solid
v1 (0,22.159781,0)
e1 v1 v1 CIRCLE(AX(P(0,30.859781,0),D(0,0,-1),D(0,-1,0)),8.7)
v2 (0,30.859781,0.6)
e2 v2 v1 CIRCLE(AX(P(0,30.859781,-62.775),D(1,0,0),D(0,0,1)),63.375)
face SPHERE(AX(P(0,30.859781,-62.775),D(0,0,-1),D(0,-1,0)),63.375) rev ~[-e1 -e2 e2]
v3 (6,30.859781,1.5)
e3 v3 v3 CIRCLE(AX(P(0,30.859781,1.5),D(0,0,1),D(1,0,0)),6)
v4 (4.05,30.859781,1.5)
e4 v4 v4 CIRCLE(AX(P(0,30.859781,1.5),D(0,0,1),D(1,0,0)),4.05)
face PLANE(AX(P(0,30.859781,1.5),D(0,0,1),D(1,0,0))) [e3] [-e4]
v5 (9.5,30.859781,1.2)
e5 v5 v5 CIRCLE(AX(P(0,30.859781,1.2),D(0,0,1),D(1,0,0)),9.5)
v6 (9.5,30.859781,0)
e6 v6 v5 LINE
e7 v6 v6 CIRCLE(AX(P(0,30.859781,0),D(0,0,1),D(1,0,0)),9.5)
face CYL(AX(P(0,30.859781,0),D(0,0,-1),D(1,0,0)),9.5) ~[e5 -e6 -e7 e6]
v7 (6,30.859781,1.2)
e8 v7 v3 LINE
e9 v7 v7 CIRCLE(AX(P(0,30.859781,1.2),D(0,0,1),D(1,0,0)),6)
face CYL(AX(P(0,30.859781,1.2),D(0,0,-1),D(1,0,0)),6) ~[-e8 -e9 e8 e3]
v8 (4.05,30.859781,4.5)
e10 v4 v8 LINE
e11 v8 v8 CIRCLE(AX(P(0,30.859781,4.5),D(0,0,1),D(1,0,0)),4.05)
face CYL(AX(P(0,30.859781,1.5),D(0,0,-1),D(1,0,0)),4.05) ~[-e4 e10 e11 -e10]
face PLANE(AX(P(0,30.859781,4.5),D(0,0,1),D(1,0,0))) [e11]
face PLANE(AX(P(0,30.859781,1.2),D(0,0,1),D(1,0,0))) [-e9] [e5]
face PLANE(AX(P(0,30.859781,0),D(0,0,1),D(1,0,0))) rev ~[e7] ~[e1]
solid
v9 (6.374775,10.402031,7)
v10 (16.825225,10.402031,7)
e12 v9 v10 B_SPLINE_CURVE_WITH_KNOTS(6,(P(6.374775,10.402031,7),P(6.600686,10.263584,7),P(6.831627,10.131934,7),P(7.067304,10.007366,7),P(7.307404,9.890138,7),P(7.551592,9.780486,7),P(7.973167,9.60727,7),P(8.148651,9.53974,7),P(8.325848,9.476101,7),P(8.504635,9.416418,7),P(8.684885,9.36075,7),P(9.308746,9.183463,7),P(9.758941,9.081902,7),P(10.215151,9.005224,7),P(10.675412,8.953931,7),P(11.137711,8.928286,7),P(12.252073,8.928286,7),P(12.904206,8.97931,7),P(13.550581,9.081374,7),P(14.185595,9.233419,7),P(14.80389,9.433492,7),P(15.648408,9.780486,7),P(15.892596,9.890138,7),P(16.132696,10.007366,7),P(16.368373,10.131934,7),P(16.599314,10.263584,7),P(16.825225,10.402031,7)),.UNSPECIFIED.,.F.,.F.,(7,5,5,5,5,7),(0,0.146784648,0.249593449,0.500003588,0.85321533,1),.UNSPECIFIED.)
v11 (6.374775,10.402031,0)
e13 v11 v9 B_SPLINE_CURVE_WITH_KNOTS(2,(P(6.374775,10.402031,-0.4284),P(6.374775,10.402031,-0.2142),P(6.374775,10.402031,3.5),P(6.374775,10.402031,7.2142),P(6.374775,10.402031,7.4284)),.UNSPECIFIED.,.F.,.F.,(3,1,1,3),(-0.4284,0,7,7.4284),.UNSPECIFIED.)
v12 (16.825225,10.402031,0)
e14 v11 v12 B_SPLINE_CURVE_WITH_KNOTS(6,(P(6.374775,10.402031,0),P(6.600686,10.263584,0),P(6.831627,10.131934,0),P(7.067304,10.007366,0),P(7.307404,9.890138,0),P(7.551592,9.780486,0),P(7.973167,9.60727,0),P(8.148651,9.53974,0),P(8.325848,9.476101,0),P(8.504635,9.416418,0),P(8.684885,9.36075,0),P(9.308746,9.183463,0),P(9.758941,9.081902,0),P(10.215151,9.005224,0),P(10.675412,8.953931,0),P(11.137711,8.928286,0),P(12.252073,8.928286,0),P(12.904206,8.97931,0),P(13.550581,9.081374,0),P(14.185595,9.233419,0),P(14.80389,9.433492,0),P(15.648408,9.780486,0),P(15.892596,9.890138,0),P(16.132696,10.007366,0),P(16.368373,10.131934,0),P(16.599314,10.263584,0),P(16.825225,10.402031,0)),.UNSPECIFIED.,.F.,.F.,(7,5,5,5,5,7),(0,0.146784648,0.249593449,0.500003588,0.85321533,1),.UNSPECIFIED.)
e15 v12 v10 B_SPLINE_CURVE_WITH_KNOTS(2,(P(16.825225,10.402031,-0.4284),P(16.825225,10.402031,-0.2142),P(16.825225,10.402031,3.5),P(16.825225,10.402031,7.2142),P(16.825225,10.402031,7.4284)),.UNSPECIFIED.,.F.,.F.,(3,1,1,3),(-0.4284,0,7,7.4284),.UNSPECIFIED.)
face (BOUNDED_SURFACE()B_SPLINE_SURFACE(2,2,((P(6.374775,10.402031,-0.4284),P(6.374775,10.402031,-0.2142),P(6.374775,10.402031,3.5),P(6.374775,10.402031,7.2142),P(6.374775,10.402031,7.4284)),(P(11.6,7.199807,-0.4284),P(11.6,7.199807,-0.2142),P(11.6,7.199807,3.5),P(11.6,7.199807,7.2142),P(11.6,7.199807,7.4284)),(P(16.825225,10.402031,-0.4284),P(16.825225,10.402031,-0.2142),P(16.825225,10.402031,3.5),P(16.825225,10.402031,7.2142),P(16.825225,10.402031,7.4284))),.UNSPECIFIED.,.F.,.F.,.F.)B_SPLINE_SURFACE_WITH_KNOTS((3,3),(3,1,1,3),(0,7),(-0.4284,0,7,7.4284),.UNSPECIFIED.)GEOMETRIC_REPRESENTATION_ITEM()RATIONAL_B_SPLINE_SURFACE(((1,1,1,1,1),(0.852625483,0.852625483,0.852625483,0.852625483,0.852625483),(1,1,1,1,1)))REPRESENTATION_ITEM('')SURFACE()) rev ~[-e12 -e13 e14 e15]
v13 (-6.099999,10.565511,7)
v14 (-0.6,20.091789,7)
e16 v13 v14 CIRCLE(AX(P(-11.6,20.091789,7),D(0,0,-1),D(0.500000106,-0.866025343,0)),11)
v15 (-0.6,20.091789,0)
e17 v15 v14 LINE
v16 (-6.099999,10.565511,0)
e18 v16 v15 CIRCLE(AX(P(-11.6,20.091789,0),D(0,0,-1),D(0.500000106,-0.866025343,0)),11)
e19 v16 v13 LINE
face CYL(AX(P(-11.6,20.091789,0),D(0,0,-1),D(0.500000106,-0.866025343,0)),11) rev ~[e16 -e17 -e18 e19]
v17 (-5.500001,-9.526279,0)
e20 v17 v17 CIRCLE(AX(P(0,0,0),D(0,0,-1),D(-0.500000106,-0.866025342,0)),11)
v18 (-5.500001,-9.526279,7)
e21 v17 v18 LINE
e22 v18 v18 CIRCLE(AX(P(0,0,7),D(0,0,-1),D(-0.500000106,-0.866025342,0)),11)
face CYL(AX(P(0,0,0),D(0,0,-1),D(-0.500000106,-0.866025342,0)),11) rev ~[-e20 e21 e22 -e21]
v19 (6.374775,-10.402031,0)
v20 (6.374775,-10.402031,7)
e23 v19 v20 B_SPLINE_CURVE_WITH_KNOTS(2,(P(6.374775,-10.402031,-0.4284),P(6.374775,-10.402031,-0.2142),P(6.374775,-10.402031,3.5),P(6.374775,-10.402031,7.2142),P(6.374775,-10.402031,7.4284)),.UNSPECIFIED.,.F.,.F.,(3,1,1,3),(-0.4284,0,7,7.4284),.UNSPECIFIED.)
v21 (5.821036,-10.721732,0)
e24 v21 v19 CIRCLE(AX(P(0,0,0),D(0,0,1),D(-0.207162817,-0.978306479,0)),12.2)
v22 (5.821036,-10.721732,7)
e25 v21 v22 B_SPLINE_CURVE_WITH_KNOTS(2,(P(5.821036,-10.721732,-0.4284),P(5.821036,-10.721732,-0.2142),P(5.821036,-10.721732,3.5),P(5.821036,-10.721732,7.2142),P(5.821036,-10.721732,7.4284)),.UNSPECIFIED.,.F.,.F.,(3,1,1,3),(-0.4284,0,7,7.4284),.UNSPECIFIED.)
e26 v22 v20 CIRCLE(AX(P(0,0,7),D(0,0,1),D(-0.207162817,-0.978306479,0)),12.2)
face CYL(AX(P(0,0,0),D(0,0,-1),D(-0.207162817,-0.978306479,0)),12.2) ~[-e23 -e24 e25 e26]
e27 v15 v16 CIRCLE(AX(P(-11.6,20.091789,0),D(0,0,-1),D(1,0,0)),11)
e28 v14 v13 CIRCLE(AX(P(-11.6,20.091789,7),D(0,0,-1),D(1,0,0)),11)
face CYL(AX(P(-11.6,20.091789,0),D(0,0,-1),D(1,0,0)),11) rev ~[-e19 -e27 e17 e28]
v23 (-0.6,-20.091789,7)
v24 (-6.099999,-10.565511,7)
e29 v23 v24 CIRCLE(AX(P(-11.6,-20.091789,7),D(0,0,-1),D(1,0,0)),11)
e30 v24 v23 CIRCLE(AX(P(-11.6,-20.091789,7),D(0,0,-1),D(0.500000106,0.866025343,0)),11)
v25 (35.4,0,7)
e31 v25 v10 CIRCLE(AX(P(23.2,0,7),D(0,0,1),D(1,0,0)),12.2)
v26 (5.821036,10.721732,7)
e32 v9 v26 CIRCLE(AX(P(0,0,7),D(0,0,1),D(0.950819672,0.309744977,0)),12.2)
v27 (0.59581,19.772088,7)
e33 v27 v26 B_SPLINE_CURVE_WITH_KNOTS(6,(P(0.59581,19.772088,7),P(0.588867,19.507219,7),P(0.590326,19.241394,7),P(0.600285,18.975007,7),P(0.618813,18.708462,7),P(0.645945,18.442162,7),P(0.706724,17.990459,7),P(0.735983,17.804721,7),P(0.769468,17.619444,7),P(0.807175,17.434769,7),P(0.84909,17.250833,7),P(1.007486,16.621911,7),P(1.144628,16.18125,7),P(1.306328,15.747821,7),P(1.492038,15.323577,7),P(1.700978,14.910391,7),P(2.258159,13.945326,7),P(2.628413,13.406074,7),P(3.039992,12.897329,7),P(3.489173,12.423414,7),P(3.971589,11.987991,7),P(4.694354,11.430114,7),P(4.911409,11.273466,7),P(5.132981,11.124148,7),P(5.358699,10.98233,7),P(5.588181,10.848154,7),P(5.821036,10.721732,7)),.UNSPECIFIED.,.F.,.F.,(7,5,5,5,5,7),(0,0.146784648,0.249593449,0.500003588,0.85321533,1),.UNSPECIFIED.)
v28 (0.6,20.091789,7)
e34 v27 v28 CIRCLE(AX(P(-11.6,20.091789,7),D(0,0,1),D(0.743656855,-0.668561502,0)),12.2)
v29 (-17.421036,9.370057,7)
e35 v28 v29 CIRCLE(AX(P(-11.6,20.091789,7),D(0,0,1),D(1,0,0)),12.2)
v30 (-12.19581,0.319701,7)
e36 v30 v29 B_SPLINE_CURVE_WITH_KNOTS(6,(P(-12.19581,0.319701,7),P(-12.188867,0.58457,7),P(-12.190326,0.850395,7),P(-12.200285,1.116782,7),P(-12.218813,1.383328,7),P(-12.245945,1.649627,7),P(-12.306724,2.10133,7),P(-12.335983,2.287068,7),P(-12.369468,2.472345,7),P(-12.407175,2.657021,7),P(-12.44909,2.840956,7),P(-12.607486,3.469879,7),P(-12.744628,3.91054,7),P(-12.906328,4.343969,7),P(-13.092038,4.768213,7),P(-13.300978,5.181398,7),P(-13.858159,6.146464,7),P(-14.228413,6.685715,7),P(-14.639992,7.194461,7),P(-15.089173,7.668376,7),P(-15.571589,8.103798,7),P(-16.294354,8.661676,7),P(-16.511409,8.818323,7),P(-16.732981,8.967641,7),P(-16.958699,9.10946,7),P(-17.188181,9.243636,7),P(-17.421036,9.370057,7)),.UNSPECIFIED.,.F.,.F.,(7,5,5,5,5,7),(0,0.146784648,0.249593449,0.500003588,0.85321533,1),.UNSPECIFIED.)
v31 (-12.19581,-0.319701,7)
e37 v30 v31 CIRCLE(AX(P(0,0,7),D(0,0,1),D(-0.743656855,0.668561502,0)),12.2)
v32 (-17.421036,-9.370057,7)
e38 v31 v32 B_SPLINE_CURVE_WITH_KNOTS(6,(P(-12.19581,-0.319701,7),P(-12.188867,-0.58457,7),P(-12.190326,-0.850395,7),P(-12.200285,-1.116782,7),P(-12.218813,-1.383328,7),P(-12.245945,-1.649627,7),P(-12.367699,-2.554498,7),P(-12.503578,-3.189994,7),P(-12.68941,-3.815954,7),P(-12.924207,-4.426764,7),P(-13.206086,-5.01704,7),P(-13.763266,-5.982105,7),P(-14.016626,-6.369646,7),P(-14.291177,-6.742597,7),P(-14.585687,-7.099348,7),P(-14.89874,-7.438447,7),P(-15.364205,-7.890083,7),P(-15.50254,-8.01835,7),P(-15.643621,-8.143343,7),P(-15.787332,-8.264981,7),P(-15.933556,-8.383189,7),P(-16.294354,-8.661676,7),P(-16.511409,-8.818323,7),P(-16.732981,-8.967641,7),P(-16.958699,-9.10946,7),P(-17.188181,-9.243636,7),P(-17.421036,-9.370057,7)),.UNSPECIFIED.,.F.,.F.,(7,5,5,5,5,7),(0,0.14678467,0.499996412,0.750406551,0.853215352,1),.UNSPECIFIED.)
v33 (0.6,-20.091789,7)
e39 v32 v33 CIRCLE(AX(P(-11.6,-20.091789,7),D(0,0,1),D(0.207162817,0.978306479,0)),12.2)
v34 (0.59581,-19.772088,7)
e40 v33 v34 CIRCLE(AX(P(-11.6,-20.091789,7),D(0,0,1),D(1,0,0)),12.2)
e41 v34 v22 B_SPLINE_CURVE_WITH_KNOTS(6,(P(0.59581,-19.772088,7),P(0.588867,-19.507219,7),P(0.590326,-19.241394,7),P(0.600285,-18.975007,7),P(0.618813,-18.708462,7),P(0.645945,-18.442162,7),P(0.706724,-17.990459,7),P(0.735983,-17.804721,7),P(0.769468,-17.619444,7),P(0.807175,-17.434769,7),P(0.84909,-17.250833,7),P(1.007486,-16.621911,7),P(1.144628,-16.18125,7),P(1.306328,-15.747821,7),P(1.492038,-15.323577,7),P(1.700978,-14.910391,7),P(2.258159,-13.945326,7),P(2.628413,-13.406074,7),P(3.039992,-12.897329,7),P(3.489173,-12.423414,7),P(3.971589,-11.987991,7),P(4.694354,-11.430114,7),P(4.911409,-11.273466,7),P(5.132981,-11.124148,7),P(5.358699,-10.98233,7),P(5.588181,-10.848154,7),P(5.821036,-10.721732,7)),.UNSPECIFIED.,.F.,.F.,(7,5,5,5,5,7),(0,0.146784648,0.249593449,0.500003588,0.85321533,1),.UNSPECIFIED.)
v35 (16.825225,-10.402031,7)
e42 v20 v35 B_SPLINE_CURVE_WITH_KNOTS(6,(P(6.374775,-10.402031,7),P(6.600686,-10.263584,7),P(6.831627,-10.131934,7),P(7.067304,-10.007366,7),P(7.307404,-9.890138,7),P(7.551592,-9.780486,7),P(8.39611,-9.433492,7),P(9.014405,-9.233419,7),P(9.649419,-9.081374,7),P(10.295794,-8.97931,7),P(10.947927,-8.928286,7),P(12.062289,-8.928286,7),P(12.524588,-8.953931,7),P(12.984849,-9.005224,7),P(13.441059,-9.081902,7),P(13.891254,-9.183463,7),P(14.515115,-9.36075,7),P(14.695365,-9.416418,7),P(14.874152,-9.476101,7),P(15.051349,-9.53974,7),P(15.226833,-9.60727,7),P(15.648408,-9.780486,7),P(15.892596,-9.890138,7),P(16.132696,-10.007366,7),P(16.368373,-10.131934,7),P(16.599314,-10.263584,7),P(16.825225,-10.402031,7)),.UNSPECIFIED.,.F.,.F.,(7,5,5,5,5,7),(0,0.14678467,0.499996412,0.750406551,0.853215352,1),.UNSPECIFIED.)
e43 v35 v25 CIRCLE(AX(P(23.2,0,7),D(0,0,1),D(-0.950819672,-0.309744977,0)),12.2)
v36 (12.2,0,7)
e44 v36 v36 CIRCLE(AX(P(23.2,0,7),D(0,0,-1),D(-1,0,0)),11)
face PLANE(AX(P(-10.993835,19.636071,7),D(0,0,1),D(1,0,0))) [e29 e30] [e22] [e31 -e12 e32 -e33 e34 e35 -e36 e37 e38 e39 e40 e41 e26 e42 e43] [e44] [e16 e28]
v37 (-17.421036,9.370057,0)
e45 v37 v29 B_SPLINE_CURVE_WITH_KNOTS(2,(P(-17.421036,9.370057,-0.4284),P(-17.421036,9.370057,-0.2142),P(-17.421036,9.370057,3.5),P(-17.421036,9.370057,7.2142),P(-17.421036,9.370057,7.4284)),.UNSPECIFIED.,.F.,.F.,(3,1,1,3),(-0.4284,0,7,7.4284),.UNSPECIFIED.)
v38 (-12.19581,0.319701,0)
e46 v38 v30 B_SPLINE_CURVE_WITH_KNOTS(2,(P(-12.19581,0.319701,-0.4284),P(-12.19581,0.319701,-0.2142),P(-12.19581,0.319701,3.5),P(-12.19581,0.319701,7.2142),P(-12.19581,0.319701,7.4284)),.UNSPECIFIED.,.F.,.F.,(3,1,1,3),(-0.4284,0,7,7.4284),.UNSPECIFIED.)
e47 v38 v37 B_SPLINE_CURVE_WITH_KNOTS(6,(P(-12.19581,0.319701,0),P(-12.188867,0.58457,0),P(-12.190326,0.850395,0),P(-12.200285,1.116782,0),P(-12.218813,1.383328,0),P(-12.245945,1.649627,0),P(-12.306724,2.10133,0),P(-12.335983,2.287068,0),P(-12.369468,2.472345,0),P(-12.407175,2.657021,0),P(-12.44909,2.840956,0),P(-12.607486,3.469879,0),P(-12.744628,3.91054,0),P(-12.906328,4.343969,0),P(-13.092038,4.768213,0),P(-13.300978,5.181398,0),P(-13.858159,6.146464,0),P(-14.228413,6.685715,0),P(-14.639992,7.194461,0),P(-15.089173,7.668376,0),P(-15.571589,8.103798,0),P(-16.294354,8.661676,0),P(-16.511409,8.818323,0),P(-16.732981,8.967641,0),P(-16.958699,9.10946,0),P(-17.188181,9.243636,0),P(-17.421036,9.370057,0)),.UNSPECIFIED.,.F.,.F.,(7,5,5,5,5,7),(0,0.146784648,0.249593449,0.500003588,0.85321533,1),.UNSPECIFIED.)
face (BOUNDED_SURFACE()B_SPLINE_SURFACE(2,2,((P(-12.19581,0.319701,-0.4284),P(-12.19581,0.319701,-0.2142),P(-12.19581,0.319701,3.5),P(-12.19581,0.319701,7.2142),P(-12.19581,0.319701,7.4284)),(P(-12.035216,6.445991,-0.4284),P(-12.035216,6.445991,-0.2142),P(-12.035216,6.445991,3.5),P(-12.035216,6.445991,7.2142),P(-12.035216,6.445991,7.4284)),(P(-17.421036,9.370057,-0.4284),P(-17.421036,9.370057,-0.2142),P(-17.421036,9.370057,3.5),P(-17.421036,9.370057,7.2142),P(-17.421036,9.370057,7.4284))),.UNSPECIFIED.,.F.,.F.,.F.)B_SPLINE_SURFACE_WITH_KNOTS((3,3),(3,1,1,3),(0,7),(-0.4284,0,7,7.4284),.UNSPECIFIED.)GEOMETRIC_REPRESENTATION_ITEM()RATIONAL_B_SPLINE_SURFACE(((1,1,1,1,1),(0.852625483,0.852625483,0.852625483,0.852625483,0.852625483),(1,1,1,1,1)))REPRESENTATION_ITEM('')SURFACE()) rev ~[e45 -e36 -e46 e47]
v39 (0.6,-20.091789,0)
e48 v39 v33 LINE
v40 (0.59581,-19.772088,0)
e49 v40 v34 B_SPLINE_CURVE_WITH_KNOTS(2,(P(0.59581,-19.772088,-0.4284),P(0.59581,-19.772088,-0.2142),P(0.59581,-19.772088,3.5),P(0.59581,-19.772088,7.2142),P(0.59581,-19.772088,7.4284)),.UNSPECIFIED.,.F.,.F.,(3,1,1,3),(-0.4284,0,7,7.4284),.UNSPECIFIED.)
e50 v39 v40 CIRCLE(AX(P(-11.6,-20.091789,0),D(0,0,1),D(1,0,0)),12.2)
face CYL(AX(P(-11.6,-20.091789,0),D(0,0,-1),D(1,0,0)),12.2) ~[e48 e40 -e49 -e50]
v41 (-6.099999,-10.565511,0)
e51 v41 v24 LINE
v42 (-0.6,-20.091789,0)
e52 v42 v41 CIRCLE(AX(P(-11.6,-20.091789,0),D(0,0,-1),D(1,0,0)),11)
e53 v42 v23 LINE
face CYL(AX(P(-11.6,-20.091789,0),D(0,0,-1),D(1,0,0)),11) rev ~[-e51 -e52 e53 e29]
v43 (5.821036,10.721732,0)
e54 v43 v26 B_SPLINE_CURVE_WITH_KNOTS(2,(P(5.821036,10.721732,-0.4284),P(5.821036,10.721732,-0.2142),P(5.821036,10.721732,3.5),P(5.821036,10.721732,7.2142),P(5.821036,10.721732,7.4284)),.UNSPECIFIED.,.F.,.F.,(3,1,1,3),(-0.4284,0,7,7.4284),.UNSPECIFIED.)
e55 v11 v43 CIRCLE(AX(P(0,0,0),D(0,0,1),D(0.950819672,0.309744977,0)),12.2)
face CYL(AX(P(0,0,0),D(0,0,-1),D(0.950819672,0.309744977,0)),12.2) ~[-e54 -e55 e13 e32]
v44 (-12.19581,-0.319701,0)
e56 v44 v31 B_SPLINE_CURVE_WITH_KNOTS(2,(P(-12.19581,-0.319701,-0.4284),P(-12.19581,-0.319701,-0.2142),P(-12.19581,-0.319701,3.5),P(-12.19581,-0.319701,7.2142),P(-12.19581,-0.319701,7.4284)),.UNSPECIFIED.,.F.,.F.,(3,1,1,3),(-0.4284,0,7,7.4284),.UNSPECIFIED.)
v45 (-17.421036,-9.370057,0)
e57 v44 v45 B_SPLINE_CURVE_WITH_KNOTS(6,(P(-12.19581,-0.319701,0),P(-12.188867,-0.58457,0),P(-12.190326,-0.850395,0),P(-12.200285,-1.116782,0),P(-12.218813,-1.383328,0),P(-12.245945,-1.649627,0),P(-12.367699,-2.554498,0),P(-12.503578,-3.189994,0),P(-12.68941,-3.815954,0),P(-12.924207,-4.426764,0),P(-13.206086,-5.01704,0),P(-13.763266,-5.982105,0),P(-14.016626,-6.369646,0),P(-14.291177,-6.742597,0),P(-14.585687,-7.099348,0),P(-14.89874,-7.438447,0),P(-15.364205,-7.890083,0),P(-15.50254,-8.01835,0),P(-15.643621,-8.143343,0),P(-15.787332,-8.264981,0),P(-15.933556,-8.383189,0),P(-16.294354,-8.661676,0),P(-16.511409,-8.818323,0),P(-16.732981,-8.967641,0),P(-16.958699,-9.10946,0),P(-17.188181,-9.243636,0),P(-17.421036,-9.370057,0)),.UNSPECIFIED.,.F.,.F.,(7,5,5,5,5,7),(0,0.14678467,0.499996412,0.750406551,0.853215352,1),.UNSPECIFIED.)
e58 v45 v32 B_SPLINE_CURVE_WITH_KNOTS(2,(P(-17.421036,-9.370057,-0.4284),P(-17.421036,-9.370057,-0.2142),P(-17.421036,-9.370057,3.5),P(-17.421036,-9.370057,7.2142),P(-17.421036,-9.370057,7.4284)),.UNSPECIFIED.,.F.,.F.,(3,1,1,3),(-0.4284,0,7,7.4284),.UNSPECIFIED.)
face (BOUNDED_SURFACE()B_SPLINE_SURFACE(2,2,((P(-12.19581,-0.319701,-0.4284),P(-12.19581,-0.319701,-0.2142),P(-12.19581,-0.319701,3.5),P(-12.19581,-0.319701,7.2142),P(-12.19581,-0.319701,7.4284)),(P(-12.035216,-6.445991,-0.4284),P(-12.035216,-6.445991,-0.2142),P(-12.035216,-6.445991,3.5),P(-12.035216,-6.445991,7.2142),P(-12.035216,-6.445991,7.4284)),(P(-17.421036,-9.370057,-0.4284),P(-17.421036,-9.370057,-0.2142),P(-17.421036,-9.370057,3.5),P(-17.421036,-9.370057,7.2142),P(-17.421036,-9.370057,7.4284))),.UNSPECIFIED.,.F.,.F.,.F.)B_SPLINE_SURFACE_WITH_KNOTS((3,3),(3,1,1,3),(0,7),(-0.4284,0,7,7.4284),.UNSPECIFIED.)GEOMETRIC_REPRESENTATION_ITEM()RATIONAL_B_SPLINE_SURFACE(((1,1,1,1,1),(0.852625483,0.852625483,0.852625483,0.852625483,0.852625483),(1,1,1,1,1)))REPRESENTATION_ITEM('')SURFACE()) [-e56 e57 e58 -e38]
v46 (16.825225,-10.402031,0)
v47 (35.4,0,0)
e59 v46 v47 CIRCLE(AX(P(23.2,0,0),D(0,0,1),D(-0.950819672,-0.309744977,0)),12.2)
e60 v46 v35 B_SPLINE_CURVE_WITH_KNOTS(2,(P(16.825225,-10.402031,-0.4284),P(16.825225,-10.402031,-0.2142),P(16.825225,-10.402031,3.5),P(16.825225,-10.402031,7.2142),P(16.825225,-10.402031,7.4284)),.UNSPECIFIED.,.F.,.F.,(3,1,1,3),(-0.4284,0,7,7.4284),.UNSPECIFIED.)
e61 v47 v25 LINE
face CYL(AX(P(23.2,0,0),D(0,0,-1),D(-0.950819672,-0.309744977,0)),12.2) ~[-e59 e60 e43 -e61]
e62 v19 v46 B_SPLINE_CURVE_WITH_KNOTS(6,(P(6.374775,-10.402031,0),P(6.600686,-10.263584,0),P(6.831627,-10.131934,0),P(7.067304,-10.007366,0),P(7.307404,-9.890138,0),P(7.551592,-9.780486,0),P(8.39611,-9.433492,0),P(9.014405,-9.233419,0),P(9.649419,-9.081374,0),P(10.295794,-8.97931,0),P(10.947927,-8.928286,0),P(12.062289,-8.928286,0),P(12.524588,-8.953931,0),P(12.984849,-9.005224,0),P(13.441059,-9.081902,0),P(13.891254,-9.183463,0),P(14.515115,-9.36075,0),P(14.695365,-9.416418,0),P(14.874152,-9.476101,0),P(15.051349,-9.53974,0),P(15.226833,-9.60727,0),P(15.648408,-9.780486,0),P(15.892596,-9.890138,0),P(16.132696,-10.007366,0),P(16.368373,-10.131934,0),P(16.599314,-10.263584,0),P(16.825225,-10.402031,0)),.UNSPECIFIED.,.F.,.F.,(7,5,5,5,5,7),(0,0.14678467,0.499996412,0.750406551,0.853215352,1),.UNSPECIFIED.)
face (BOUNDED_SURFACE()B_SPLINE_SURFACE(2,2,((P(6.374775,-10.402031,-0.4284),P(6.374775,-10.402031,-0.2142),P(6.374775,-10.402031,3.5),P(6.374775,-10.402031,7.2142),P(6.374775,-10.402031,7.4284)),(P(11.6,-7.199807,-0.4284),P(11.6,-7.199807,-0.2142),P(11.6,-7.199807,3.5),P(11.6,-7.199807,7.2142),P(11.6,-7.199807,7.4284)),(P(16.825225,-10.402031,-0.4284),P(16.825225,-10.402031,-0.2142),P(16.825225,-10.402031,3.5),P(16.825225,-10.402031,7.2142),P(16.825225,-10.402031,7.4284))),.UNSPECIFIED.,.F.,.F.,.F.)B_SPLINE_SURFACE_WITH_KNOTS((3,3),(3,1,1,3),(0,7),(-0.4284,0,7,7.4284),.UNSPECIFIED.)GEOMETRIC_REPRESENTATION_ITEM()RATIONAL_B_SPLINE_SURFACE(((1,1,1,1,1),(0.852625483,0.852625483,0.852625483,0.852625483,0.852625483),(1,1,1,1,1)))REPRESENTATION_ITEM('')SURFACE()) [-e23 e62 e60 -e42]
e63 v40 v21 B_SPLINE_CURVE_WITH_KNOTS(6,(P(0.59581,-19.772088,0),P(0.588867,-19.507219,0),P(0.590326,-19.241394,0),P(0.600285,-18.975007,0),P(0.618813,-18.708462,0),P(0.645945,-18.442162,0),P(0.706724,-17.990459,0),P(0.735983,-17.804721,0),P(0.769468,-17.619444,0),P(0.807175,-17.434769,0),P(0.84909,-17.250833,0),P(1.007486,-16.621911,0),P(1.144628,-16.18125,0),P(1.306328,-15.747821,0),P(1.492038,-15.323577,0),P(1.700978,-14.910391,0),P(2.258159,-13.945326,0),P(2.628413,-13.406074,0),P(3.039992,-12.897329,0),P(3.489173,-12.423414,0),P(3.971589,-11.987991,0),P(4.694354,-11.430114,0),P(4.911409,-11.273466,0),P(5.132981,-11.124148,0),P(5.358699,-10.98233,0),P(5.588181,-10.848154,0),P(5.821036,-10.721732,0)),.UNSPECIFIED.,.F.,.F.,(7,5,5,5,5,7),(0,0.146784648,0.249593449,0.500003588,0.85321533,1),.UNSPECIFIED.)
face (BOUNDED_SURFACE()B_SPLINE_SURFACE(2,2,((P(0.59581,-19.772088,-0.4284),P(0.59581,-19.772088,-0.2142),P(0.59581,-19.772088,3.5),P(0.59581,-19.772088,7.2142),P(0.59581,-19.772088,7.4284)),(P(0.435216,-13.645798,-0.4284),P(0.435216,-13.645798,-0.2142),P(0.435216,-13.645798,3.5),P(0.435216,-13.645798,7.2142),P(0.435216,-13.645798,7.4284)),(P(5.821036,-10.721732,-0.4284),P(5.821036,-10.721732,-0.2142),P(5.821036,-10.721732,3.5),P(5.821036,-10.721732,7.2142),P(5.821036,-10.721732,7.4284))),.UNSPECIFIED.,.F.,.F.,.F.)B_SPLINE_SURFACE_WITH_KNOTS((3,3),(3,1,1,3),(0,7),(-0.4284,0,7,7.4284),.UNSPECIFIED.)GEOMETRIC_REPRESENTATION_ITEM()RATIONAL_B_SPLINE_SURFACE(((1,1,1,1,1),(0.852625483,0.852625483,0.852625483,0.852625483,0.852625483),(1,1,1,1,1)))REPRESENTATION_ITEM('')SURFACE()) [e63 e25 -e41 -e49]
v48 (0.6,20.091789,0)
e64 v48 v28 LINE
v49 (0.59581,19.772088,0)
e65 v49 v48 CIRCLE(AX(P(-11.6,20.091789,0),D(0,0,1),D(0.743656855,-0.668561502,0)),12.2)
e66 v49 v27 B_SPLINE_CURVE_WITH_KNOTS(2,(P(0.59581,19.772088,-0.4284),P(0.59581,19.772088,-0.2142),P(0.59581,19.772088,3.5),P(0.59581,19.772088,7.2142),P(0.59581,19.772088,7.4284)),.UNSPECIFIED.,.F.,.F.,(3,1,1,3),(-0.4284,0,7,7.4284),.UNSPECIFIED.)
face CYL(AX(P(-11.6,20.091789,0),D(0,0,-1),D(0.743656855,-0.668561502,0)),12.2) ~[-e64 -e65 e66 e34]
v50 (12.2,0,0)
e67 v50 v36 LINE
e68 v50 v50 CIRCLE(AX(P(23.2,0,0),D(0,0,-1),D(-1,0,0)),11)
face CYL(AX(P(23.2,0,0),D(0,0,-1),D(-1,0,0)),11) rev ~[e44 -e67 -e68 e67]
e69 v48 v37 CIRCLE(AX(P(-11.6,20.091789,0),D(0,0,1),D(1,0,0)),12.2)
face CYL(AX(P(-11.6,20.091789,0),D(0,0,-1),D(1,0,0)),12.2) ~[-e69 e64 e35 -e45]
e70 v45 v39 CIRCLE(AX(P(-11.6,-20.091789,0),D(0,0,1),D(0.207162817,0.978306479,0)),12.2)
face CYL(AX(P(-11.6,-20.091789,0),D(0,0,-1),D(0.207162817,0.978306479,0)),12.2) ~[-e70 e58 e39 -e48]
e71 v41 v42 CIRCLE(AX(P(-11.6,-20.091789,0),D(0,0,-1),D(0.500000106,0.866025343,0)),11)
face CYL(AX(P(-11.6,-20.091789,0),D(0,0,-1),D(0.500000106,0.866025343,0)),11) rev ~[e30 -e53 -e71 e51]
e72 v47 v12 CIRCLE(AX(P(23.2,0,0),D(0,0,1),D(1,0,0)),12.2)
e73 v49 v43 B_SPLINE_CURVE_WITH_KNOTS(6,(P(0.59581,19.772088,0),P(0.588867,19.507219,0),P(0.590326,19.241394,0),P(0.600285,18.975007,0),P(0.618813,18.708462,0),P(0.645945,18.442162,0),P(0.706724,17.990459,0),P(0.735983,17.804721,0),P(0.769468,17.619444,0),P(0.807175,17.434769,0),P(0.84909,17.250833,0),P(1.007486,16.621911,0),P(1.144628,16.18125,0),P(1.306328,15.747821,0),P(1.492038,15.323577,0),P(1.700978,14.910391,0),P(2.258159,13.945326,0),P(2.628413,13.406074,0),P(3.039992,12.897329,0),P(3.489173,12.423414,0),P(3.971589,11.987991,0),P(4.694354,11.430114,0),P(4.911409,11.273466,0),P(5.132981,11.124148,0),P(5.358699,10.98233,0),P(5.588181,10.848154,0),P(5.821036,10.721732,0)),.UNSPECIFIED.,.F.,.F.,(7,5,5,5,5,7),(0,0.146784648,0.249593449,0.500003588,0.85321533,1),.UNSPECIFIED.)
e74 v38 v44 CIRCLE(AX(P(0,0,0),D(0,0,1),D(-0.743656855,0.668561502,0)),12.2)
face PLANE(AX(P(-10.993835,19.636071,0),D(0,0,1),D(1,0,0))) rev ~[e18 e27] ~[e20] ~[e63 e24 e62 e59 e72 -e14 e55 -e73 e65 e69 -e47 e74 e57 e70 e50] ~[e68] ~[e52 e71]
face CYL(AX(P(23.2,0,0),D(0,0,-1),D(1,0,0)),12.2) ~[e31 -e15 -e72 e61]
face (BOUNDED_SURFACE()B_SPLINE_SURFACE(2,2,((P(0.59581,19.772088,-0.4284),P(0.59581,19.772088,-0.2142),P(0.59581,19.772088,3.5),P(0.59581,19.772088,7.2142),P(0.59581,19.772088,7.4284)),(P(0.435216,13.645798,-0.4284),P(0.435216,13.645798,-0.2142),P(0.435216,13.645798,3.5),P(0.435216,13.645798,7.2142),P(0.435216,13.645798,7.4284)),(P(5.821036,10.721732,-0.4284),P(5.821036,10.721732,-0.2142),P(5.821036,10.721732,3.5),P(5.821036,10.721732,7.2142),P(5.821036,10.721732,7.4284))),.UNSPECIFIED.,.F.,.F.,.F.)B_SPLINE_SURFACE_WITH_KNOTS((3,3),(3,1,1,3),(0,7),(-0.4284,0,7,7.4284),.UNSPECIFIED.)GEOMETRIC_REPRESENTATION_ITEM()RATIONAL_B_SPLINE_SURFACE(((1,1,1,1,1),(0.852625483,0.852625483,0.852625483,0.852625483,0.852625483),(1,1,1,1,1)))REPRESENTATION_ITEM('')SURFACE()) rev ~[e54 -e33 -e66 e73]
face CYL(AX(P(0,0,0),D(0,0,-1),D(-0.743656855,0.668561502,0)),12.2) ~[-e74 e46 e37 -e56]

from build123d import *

# Parameters (mm, degrees)
F1_DEPTH = 7
F2_R     = 10
F3_R     = 9.5
F4_DEPTH = 1.2
F5_R     = 6
F6_DEPTH = 0.3
F7_R     = 4.05
F8_DEPTH = 3


with BuildPart() as f1:
    # F0 (on Top) → F1 (new body)
    with BuildSketch(Plane.XY):
        with BuildLine():
            ThreePointArc((0.6, 20.0917893678), (-21.0782412309, 27.7731266973), (-9.0726136344, 8.1564503211))
            ThreePointArc((-9.0726136344, 8.1564503211), (-7.6813368071, 9.4782416543), (-6.0999988352, 10.5655105986))
            ThreePointArc((-6.0999988352, 10.5655105986), (-4.3677283965, 11.3913541186), (-2.5273863656, 11.9353390467))
            ThreePointArc((-2.5273863656, 11.9353390467), (-0.2086461222, 15.7240603434), (0.6, 20.0917893678))
        make_face()
        with BuildLine():
            ThreePointArc((-0.6, 20.0917893678), (-2.0737202221, 14.5917899502), (-6.0999988352, 10.5655105986))
            ThreePointArc((-6.0999988352, 10.5655105986), (-21.1262797779, 25.5917887854), (-0.6, 20.0917893678))
        make_face(mode=Mode.SUBTRACT)
        with BuildLine():
            ThreePointArc((-5.500001168, 9.5262787673), (5.499999416, 9.5262797788), (11, 0))
            ThreePointArc((11, 0), (11.1509336461, 1.913112647), (11.6, 3.7788887255))
            ThreePointArc((11.6, 3.7788887255), (6.1, 10.5655099262), (-2.5273863656, 11.9353390467))
            ThreePointArc((-2.5273863656, 11.9353390467), (-3.9186631944, 10.6135477124), (-5.500001168, 9.5262787673))
        make_face()
        with BuildLine():
            ThreePointArc((-9.0726136344, 8.1564503211), (-7.2322716053, 8.7004352486), (-5.500001168, 9.5262787673))
            ThreePointArc((-5.500001168, 9.5262787673), (-3.9186631944, 10.6135477124), (-2.5273863656, 11.9353390467))
            ThreePointArc((-2.5273863656, 11.9353390467), (-4.3677283965, 11.3913541186), (-6.0999988352, 10.5655105986))
            ThreePointArc((-6.0999988352, 10.5655105986), (-7.6813368071, 9.4782416543), (-9.0726136344, 8.1564503211))
        make_face()
        with BuildLine():
            ThreePointArc((11.6, -3.7788887255), (11.1509336461, -1.913112647), (11, 0))
            ThreePointArc((11, 0), (5.4999994158, -9.5262797789), (-5.5000011684, -9.526278767))
            ThreePointArc((-5.5000011684, -9.526278767), (-3.9186631946, -10.6135477122), (-2.5273863656, -11.9353390467))
            ThreePointArc((-2.5273863656, -11.9353390467), (6.1, -10.5655099262), (11.6, -3.7788887255))
        make_face()
        with BuildLine():
            ThreePointArc((11.6, 3.7788887255), (11.1509336461, 1.913112647), (11, 0))
            ThreePointArc((11, 0), (11.1509336461, -1.913112647), (11.6, -3.7788887255))
            ThreePointArc((11.6, -3.7788887255), (12.0490663539, -1.913112647), (12.2, 0))
            ThreePointArc((12.2, 0), (12.0490663539, 1.913112647), (11.6, 3.7788887255))
        make_face()
        with BuildLine():
            ThreePointArc((35.4, 0), (25.113112647, 12.0490663539), (11.6, 3.7788887255))
            ThreePointArc((11.6, 3.7788887255), (12.0490663539, 1.913112647), (12.2, 0))
            ThreePointArc((12.2, 0), (12.0490663539, -1.913112647), (11.6, -3.7788887255))
            ThreePointArc((11.6, -3.7788887255), (25.113112647, -12.0490663539), (35.4, 0))
        make_face()
        with BuildLine():
            ThreePointArc((34.2, 0), (23.2, -11), (12.2, 0))
            ThreePointArc((12.2, 0), (23.2, 11), (34.2, 0))
        make_face(mode=Mode.SUBTRACT)
        with BuildLine():
            ThreePointArc((-5.5000011684, -9.526278767), (-11, 3e-10), (-5.500001168, 9.5262787673))
            ThreePointArc((-5.500001168, 9.5262787673), (-7.2322716053, 8.7004352486), (-9.0726136344, 8.1564503211))
            ThreePointArc((-9.0726136344, 8.1564503211), (-12.2, 0), (-9.0726136344, -8.1564503211))
            ThreePointArc((-9.0726136344, -8.1564503211), (-7.2322716055, -8.7004352485), (-5.5000011684, -9.526278767))
        make_face()
        with BuildLine():
            ThreePointArc((-2.5273863656, -11.9353390467), (-3.9186631946, -10.6135477122), (-5.5000011684, -9.526278767))
            ThreePointArc((-5.5000011684, -9.526278767), (-7.2322716055, -8.7004352485), (-9.0726136344, -8.1564503211))
            ThreePointArc((-9.0726136344, -8.1564503211), (-7.6813368071, -9.4782416543), (-6.0999988352, -10.5655105986))
            ThreePointArc((-6.0999988352, -10.5655105986), (-4.3677283965, -11.3913541186), (-2.5273863656, -11.9353390467))
        make_face()
        with BuildLine():
            ThreePointArc((0.6, -20.0917893678), (-0.2086461222, -15.7240603434), (-2.5273863656, -11.9353390467))
            ThreePointArc((-2.5273863656, -11.9353390467), (-4.3677283965, -11.3913541186), (-6.0999988352, -10.5655105986))
            ThreePointArc((-6.0999988352, -10.5655105986), (-7.6813368071, -9.4782416543), (-9.0726136344, -8.1564503211))
            ThreePointArc((-9.0726136344, -8.1564503211), (-21.0782412309, -27.7731266973), (0.6, -20.0917893678))
        make_face()
        with BuildLine():
            ThreePointArc((-0.6, -20.0917893678), (-21.1262797779, -25.5917887854), (-6.0999988352, -10.5655105986))
            ThreePointArc((-6.0999988352, -10.5655105986), (-2.0737202221, -14.5917899502), (-0.6, -20.0917893678))
        make_face(mode=Mode.SUBTRACT)
    extrude(amount=F1_DEPTH)

    # F2
    f2_edges = [f1.edges().sort_by_distance(p)[0] for p in [
        (-9.072614, 8.15645, 3.5),
        (11.6, -3.778889, 3.5),
        (11.6, 3.778889, 3.5),
        (-2.527386, 11.935339, 3.5),
        (-2.527386, -11.935339, 3.5),
        (-9.072614, -8.15645, 3.5),
    ]]
    fillet(f2_edges, radius=F2_R)


with BuildPart() as f4:
    # F3 (on Top) → F4 (new body)
    with BuildSketch(Plane.XY):
        with Locations((0, 30.8597814292)):
            Circle(F3_R)
    extrude(amount=F4_DEPTH)

    # F5 (on face) → F6 (join)
    with BuildSketch(Plane.XY.offset(1.2)):
        with Locations((0, 30.8597814292)):
            Circle(F5_R)
    extrude(amount=F6_DEPTH)

    # F7 (on face) → F8 (join)
    with BuildSketch(Plane.XY.offset(1.5)):
        with Locations((0, 30.8597814292)):
            Circle(F7_R)
    extrude(amount=F8_DEPTH)

    # F9 (on Right) → F10 (revolve, cut)
    with BuildSketch(Plane.YZ):
        with BuildLine():
            ThreePointArc((30.8597814292, 0.6), (26.499448873, 0.4498220638), (22.1597814292, 0))
            Line((22.1597814292, 0), (30.8597814292, 0))
            Line((30.8597814292, 0), (30.8597814292, 0.6))
        make_face()
    revolve(axis=Axis((0, 30.8597814292, 0.3), (0, 0, -1)), mode=Mode.SUBTRACT)


solid = Compound([f1.part, f4.part])
